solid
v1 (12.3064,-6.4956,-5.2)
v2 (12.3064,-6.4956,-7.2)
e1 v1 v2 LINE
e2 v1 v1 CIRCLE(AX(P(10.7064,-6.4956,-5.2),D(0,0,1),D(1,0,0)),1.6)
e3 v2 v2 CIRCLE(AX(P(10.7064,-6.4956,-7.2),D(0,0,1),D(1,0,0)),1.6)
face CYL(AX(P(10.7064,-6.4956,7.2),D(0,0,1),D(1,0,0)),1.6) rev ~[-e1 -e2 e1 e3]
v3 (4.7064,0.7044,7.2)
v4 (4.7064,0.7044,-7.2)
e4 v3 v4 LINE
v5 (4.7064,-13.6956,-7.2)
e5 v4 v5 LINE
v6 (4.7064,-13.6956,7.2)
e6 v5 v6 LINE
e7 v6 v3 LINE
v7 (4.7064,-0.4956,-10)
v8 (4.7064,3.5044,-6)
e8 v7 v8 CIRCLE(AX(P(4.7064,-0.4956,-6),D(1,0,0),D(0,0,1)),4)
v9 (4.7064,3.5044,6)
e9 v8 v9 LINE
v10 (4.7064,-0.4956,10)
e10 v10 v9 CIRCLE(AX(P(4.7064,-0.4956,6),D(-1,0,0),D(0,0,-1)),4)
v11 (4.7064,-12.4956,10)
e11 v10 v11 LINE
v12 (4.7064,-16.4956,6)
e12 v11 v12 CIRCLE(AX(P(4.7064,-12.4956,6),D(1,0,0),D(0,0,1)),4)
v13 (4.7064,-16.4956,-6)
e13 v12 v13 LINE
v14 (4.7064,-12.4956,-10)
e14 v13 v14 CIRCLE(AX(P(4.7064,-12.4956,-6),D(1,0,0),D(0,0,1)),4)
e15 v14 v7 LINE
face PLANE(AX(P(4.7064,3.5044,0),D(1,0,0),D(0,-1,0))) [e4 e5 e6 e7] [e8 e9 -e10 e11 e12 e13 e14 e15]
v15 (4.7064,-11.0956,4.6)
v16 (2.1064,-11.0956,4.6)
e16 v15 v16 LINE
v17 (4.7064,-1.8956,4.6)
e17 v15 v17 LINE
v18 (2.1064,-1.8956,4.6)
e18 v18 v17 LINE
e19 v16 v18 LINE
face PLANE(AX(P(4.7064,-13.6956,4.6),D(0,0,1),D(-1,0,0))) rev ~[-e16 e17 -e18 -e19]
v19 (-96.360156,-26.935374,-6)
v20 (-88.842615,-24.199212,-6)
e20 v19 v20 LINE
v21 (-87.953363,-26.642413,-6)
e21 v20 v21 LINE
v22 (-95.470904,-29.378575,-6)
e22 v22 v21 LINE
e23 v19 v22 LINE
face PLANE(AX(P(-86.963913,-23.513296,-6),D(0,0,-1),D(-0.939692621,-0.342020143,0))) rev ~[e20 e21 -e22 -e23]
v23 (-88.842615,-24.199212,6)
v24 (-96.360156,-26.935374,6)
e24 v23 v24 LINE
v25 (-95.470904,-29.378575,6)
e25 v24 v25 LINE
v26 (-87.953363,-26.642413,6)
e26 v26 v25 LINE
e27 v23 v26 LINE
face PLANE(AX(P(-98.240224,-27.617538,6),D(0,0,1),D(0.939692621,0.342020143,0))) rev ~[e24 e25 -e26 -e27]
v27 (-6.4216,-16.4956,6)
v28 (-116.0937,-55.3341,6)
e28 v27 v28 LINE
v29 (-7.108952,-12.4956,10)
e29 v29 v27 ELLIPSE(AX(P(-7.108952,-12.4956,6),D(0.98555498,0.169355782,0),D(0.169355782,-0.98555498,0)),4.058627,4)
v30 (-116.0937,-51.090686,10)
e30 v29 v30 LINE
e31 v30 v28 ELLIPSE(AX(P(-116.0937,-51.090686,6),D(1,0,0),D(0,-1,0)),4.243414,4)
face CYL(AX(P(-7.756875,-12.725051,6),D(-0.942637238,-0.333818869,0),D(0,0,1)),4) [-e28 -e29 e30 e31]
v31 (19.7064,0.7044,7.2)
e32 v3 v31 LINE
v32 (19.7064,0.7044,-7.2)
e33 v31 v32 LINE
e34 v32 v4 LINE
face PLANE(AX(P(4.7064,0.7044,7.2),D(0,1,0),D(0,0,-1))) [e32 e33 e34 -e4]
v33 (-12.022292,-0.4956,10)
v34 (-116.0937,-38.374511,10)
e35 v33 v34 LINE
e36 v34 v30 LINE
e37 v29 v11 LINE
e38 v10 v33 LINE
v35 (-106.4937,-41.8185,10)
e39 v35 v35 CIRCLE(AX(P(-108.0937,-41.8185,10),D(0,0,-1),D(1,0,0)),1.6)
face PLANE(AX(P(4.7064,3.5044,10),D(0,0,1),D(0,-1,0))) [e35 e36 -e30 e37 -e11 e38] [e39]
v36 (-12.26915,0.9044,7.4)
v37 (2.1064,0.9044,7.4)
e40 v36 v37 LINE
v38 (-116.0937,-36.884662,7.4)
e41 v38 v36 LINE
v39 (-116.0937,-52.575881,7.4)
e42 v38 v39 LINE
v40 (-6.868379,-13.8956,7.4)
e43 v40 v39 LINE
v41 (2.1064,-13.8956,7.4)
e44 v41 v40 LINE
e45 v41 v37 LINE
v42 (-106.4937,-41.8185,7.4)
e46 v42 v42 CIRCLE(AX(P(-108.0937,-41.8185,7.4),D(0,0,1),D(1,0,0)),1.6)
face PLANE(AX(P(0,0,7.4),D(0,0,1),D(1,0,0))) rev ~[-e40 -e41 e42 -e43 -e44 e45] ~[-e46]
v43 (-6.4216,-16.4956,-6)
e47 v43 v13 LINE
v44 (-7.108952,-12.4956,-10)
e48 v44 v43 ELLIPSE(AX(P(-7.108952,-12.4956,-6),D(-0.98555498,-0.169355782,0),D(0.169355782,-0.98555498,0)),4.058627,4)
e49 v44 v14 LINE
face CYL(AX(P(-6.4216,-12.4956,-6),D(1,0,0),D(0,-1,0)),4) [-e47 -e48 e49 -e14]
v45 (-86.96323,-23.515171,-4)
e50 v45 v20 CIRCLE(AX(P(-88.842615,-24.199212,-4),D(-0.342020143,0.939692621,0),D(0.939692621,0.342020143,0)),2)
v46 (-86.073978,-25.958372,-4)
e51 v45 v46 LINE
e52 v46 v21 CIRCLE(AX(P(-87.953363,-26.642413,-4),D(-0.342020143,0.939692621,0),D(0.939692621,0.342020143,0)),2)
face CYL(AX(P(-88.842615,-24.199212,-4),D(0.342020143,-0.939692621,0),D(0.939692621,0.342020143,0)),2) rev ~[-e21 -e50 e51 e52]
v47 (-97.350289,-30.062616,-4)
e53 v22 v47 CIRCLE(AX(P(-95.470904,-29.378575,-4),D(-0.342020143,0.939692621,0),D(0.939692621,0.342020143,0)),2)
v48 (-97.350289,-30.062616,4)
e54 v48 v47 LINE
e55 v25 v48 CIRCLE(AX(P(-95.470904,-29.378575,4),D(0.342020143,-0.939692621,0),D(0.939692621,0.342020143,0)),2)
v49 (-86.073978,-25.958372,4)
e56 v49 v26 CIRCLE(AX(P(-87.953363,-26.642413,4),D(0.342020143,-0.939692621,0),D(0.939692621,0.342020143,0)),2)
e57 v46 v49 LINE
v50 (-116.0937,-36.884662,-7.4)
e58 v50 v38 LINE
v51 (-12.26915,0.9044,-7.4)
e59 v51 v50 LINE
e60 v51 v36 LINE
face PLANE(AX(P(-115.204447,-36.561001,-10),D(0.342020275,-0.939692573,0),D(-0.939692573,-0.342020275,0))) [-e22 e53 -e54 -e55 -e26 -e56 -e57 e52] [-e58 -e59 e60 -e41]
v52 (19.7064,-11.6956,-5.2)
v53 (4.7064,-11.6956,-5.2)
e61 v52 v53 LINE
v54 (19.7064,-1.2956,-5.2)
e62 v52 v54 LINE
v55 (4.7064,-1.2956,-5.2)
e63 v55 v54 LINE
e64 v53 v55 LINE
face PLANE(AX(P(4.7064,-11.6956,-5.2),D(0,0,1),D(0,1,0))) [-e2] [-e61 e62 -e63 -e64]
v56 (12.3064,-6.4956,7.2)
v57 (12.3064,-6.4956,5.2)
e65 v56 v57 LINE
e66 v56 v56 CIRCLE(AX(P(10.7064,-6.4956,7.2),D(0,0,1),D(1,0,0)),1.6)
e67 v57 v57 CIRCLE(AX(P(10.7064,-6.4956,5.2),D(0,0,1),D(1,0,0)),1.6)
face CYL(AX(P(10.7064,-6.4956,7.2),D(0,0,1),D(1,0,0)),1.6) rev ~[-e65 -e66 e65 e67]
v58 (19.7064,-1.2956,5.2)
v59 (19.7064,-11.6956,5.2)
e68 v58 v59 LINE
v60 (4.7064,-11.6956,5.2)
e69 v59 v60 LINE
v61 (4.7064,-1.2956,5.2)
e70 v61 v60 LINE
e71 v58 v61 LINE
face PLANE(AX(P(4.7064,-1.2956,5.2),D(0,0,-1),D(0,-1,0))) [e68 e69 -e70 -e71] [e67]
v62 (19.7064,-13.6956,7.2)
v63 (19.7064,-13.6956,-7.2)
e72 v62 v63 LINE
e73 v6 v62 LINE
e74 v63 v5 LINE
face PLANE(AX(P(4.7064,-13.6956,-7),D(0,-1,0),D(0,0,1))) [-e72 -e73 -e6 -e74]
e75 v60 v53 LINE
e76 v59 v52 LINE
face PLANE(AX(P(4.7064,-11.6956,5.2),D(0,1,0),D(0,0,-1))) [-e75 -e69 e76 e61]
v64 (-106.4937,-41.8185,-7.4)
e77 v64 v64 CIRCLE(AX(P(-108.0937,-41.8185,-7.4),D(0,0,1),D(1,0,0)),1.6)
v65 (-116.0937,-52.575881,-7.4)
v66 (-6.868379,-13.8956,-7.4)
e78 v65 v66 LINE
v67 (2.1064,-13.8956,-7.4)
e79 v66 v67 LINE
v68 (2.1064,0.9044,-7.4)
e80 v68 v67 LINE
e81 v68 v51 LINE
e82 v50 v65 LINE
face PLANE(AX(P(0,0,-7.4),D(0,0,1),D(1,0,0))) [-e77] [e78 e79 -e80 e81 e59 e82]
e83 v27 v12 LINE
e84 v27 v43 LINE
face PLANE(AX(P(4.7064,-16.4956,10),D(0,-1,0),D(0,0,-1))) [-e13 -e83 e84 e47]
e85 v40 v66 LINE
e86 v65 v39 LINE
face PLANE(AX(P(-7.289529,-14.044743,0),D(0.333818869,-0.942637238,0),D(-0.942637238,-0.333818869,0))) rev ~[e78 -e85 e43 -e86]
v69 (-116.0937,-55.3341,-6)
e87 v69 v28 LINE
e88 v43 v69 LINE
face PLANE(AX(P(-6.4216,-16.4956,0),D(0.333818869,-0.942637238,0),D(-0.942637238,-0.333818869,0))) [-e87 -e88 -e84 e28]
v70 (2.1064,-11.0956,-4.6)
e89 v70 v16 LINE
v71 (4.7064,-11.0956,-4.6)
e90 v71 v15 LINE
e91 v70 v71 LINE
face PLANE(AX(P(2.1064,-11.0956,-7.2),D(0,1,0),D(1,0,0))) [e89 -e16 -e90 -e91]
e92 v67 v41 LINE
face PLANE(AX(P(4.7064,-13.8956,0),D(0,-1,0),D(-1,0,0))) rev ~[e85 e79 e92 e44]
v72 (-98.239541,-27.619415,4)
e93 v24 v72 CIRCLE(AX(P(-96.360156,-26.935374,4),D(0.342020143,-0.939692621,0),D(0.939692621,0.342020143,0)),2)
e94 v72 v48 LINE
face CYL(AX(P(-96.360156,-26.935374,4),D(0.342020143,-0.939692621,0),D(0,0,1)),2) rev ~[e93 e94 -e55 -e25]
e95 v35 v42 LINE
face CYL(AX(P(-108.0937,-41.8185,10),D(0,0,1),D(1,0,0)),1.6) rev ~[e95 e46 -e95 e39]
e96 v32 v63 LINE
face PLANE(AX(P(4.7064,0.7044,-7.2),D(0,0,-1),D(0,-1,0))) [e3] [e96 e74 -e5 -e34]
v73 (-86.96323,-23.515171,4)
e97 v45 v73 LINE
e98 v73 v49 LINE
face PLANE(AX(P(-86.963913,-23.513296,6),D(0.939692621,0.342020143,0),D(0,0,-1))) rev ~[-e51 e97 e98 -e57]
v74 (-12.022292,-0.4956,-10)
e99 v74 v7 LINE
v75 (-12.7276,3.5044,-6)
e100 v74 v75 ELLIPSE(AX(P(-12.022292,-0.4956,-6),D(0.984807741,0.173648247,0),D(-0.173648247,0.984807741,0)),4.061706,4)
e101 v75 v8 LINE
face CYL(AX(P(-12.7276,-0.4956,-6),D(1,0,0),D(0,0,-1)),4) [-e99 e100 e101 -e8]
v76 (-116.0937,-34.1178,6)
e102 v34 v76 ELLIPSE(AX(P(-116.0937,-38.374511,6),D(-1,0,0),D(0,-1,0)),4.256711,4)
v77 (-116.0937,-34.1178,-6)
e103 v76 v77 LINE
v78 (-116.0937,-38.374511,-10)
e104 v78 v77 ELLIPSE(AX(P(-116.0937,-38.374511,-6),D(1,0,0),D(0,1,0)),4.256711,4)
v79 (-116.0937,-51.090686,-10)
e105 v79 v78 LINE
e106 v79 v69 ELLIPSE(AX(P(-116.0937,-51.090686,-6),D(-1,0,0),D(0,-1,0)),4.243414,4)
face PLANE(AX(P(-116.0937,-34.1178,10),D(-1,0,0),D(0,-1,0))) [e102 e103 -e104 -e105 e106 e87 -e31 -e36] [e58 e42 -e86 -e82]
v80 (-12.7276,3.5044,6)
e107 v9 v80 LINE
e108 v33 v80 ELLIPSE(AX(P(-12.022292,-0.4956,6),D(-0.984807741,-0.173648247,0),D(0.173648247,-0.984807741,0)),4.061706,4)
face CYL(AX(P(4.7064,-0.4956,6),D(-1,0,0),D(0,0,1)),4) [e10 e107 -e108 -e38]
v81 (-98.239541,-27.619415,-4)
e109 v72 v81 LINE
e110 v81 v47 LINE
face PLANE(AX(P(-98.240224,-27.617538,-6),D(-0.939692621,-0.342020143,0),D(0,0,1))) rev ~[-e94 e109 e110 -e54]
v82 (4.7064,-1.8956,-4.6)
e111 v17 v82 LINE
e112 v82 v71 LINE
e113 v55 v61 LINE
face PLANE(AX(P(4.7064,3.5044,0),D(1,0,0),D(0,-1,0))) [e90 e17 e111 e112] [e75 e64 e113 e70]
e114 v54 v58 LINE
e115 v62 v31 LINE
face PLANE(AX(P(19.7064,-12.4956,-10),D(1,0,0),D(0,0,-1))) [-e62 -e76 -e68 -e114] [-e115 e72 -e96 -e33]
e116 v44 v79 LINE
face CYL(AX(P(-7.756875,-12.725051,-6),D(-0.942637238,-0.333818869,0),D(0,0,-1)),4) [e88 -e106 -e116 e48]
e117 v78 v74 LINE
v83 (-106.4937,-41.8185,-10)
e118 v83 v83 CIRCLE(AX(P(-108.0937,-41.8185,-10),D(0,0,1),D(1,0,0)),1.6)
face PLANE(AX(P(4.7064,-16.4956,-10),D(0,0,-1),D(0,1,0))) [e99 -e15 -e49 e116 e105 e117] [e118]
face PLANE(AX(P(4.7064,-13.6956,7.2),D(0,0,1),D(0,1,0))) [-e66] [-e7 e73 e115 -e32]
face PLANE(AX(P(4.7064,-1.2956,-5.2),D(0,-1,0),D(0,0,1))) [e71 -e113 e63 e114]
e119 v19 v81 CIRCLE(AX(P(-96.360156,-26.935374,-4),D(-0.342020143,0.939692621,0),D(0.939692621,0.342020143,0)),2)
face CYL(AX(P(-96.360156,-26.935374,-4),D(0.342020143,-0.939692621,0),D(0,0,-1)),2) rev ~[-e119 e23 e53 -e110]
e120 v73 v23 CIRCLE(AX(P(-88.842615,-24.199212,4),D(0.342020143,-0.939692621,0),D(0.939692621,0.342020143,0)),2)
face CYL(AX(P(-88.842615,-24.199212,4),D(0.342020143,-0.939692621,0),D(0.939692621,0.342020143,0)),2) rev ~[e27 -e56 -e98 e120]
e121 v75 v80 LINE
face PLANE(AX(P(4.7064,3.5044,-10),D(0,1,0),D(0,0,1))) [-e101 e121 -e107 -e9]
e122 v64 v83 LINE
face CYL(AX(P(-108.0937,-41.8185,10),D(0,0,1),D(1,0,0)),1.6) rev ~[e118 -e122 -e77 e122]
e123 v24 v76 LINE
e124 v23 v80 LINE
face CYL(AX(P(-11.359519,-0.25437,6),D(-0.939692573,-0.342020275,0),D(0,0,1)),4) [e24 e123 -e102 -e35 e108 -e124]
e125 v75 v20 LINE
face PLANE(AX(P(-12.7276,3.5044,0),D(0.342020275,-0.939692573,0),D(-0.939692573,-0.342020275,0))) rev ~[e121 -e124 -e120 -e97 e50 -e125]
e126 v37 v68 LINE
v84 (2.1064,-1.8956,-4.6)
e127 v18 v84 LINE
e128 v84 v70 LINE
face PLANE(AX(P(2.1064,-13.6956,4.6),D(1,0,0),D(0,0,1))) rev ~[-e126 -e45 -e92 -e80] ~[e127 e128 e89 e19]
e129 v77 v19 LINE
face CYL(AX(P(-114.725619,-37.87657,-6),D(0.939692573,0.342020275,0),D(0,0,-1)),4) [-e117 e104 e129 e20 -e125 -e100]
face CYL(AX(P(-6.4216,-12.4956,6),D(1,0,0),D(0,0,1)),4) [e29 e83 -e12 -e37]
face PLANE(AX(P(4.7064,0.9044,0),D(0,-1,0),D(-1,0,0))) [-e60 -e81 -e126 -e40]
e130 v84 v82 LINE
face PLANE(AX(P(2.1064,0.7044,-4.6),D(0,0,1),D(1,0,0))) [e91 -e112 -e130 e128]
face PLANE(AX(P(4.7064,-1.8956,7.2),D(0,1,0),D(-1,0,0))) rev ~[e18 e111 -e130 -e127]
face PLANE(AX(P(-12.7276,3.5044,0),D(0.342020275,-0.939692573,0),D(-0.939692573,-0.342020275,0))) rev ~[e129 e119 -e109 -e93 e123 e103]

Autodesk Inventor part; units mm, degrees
ref_plane "YZ Plane" through (0, 0, 0) normal (1, 0, 0) x (0, 1, 0)
ref_plane "XZ Plane" through (0, 0, 0) normal (0, 1, 0) x (-1, 0, 0)
sketch "Skizze1" plane through (0, 0, 0) normal (0, 0, 1) x (1, 0, 0)
  line L0 (4.7064, 3.5044) -> (-12.7276, 3.5044)
  line L1 (-12.7276, 3.5044) -> (-116.0937, -34.1178)
  line L2 (4.7064, 3.5044) -> (4.7064, -16.4956)
  line L3 (4.7064, -16.4956) -> (-6.4216, -16.4956)
  line L4 (-6.4216, -16.4956) -> (-116.0937, -55.3341)
  line L5 (-116.0937, -34.1178) -> (-116.0937, -55.4014)
  line L6 (0, 15.2855) -> (0, -67.1826) projected
  line L7 (-140.2538, 0) -> (28.8665, 0) projected
  point P0 (0, 0)
  dimension "d0" = 17.434
  dimension "d1" = 110
  dimension "d4" = 20
  dimension "d5" = 11.128
  dimension "d38" = 4.7065
  dimension "d39" = 16.4956
  dimension "d40" = 20
  dimension "d44" = 160.499
ref_plane "Arbeitsebene2" through (4.7064, -12.4956, -10) normal (1, 0, 0) x (0, 0, -1)
sketch "Skizze3" plane through (4.7064, -12.4956, -10) normal (1, 0, 0) x (0, 0, -1)
  line L0 (-3, -65.9356) -> (-3, 0) projected
  line L1 (-17.2, 13.2) -> (-2.8, 13.2)
  line L2 (-2.8, 13.2) -> (-2.8, -1.2)
  line L3 (-2.8, -1.2) -> (-17.2, -1.2)
  line L4 (-17.2, -1.2) -> (-17.2, 13.2)
  line L5 (-4.8, 11.2) -> (-15.2, 11.2)
  line L6 (-15.2, 11.2) -> (-15.2, 0.8)
  line L7 (-15.2, 0.8) -> (-4.8, 0.8)
  line L8 (-4.8, 0.8) -> (-4.8, 11.2)
  line L9 (-2.8, -1.2) -> (-17.2, -1.2) projected
  line L10 (-17.2, -1.2) -> (-17.2, 13.2) projected
  point P0 (-3, -1.2)
  point P1 (-3, 0)
  dimension "d13" = 14.4
  dimension "d14" = 14.4
  dimension "d15" = 2
  dimension "d31" = 0
  dimension "d32" = 0
extrude "Extrusion2" add sketch "Skizze3" along normal blind 15 and the other way blind 7.5
sketch "Skizze5" plane through (-2.7936, -13.6956, 7.2) normal (0, 0, 1) x (1, 0, 0)
  circle A0 centre (13.5, 7.2) radius 1.6
  line L0 (22.5, 14.4) -> (22.5, 0) projected
  line L1 (0, 0) -> (22.5, 0) projected
  dimension "d29" = 3.2
  dimension "d47" = 7.2
  dimension "d48" = 9
extrude "Extrusion4" cut sketch "Skizze5" against normal up to surface (14.4 mm away)
extrude "Extrusion5" add sketch "Skizze1" along normal mid plane 20
shell "Wandung2" thickness 2.6 removed faces 2 at (-116.0937, -48.262, 3.3333) at (4.7064, -4.7623, 1.7333)
fillet "Rundung5" radius 4 8 edges at (-64.4106, -15.3067, 10) (-64.4106, -15.3067, -10) (-61.2576, -35.9149, 10) (-61.2576, -35.9149, -10) (-0.8576, -16.4956, 10) (-4.0106, 3.5044, 10) (-4.0106, 3.5044, -10) (-0.8576, -16.4956, -10)
sketch "Skizze6" plane through (-116.0937, -34.1178, 6) normal (-0.3420201, 0.9396926, 0) x (0.9396926, 0.3420201, 0)
  line L0 (31, 12) -> (19, 12)
  line L1 (19, 12) -> (19, 0)
  line L2 (19, 0) -> (31, 0)
  line L3 (31, 0) -> (31, 12)
  line L4 (109.2947, 16) -> (-1.4559, 16) projected
  line L5 (0, 0) -> (0, 12) projected
  point P0 (120.7614, 6)
  dimension "d49" = 12
  dimension "d50" = 12
  dimension "d51" = 4
  dimension "d52" = 19
extrude "Extrusion6" cut sketch "Skizze6" against normal blind 3
fillet "Rundung6" radius 2 4 edges at (-86.5186, -24.7368, -6) (-86.5186, -24.7368, 6) (-97.795, -28.8411, 6) (-97.795, -28.8411, -6)
sketch "Skizze7" plane through (0, 0, 10) normal (0, 0, 1) x (1, 0, 0)
  line L0 (-116.0937, -36.8847) -> (-116.0937, -52.5759) projected
  line L1 (-116.0937, -44.7303) -> (-90.1056, -35.2714)
  line L2 (-116.0937, -44.7303) -> (-88.4377, -44.7303) construction
  circle A0 centre (-108.0937, -41.8185) radius 1.6
  point P0 (0, 0)
  dimension "d56" = 20
  dimension "d57" = 3.2
  dimension "d58" = 8
extrude "Extrusion7" cut sketch "Skizze7" against normal up to surface (20 mm away)
sketch "Skizze8" plane through (0, 0, 0) normal (0, 0, 1) x (1, 0, 0)
  line L0 (68.2789, 41.5515) -> (-80.5987, 41.5515)
  line L1 (-80.5987, 41.5515) -> (-80.5987, -93.926)
  line L2 (-80.5987, -93.926) -> (68.2789, -93.926)
  line L3 (68.2789, -93.926) -> (68.2789, 41.5515)
  point P0 (0, 0)
properties part number "_3D-Druck"
